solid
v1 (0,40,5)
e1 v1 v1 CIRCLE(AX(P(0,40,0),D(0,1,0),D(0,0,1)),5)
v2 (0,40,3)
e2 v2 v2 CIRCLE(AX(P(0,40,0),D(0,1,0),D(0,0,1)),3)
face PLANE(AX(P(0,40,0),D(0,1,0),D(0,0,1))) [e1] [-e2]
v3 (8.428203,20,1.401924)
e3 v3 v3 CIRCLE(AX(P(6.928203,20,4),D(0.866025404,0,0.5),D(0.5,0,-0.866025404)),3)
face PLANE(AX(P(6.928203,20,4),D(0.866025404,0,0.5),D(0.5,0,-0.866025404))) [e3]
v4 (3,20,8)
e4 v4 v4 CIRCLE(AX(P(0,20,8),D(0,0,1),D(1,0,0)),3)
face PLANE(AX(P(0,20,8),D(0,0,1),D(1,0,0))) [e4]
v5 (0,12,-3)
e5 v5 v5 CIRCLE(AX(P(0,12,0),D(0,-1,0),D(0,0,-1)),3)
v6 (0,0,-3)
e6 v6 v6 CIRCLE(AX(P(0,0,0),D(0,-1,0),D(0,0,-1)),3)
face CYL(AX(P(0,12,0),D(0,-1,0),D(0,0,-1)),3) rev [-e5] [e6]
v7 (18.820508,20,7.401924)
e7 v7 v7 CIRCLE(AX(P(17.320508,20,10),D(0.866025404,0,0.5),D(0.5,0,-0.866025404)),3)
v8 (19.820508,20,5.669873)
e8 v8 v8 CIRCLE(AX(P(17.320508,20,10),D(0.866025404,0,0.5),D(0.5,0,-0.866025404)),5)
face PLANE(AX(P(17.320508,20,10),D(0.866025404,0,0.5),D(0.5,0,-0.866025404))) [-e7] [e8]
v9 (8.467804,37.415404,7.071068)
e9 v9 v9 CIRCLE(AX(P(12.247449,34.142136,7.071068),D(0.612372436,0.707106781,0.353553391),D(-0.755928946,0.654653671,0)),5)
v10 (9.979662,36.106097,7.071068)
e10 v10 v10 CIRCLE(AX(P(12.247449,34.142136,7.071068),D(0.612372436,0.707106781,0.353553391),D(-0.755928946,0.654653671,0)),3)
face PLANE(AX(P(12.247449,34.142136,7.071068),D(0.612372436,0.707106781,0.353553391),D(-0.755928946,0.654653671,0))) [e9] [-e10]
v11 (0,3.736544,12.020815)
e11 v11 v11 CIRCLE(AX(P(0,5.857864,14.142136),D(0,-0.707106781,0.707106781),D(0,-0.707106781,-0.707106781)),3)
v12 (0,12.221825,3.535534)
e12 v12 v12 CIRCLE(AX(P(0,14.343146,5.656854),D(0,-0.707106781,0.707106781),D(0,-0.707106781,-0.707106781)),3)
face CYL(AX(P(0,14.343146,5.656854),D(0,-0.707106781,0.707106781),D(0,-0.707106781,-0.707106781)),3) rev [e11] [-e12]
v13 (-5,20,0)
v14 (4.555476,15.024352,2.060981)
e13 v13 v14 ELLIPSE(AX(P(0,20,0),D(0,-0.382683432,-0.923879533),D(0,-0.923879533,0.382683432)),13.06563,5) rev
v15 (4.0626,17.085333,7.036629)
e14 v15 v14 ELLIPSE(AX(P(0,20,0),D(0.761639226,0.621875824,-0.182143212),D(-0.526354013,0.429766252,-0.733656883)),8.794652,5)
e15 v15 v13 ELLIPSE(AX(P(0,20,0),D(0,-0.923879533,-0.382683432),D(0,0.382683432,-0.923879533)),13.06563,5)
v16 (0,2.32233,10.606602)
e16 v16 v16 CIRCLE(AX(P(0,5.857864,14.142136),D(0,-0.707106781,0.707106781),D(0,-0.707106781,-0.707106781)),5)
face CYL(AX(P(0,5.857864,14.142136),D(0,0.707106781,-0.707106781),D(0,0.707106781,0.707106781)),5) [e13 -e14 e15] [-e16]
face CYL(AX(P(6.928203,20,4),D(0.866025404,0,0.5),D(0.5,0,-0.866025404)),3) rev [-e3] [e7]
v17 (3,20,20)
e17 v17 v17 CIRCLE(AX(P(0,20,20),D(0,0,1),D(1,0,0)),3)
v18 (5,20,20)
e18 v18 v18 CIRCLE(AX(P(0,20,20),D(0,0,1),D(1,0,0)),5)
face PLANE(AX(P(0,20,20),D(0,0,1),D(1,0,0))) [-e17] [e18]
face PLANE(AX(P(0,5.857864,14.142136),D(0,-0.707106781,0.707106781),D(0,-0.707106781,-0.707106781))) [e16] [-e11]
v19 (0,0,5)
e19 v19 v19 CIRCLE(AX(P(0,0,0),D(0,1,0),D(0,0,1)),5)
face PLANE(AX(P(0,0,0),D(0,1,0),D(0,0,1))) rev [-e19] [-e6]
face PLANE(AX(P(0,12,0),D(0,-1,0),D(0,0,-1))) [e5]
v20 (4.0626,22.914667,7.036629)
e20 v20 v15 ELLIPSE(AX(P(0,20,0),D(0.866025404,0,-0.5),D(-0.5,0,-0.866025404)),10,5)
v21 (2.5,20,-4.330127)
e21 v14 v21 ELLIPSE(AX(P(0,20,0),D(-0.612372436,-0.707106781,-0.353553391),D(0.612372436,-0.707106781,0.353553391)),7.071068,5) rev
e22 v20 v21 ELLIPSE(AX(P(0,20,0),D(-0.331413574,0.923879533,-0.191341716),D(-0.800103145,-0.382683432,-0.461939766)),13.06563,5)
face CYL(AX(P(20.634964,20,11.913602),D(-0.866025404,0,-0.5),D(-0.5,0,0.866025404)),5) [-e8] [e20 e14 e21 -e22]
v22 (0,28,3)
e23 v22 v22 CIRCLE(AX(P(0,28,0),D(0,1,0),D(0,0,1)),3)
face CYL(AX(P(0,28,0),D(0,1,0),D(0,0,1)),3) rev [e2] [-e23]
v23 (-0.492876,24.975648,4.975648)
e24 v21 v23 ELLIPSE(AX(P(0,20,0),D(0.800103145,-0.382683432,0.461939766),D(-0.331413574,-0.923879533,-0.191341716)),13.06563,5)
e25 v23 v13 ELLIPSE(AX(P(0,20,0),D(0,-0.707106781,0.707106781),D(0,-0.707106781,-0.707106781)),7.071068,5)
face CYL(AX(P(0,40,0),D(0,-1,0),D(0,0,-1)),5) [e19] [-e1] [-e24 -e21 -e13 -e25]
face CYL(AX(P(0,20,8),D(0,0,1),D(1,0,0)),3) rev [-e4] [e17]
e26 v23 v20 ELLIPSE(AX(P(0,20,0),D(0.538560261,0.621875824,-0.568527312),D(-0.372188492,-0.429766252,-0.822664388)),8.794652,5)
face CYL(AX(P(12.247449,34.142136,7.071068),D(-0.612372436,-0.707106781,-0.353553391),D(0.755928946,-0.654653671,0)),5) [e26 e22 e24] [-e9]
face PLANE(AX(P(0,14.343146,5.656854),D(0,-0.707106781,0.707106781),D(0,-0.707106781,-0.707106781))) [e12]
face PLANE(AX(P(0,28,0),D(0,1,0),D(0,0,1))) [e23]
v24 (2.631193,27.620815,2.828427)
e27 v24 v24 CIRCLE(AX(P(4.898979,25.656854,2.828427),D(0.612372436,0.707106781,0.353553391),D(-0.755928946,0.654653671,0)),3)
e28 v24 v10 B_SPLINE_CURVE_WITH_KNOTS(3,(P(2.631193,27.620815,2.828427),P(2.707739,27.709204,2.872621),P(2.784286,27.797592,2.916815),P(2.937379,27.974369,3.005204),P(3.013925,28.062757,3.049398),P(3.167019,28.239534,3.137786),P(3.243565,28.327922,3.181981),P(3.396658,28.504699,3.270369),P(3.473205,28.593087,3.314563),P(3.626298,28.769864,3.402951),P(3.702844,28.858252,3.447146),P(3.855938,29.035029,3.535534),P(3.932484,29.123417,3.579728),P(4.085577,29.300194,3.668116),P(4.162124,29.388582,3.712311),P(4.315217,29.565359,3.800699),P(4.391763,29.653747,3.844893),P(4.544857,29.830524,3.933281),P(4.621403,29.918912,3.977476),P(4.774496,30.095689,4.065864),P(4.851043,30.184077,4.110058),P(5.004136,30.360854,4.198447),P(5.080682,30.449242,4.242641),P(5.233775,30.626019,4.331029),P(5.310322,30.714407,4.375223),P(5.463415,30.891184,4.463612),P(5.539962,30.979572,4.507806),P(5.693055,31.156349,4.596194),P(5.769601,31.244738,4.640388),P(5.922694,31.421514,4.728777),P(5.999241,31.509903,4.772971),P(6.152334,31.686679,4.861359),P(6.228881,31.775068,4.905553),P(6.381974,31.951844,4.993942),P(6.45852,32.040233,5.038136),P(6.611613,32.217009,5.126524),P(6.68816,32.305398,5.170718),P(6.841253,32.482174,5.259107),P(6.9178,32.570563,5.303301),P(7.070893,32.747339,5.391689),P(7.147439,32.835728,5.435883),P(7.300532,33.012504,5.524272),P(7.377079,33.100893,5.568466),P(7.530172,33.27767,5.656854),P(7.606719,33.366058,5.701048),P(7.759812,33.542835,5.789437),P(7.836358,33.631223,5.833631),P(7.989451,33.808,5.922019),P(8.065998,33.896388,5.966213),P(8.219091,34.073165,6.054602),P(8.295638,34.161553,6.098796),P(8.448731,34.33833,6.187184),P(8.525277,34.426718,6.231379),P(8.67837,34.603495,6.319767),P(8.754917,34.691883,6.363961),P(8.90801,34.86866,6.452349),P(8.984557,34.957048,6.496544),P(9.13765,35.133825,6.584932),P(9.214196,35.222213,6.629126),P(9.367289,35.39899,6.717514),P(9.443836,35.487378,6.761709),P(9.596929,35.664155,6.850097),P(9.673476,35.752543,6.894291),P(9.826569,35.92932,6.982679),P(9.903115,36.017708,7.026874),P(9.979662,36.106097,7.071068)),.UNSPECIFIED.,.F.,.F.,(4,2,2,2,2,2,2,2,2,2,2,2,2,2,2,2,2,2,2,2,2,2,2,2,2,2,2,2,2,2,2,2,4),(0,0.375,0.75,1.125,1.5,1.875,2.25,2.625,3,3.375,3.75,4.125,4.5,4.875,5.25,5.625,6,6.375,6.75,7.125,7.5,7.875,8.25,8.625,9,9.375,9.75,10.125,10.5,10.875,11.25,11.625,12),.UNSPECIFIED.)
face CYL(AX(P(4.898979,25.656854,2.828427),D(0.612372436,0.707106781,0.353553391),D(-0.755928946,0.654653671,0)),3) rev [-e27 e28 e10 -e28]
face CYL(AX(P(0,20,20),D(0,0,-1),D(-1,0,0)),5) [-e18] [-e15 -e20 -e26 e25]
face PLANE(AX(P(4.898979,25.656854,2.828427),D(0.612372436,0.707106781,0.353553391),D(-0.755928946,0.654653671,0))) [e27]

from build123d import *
from OCP.BRepAlgoAPI import BRepAlgoAPI_Cut
from OCP.TopTools import TopTools_ListOfShape

# Parameters (mm, degrees)
SKETCH1_R                = 5
BOSS_EXTRUDE1_DEPTH      = 40
SKETCH2_R                = 5
BOSS_EXTRUDE2_DEPTH      = 20
SKETCH4_R                = 5
BOSS_EXTRUDE3_DEPTH      = 20
BOSS_EXTRUDE4_DEPTH      = 10
BOSS_EXTRUDE4_DEPTH_BACK = 13.827204
SKETCH6_R                = 5
SKETCH8_R                = 5
CUT_EXTRUDE1_DEPTH       = 3.827204
SKETCH13_R               = 5
BOSS_EXTRUDE5_DEPTH      = 20
SKETCH14_R               = 3
CUT_EXTRUDE2_DEPTH       = 12
CUT_EXTRUDE3_START       = -12
SKETCH15_R               = 3
CUT_EXTRUDE3_DEPTH       = 12
SKETCH16_R               = 3
CUT_EXTRUDE4_DEPTH       = 12
SKETCH17_R               = 3
CUT_EXTRUDE5_DEPTH       = 12
SKETCH18_R               = 3
CUT_EXTRUDE6_DEPTH       = 12
SKETCH19_R               = 3
CUT_EXTRUDE7_DEPTH       = 12


with BuildPart() as part:
    # Sketch1 → Boss-Extrude1 (new body)
    with BuildSketch(Plane(origin=(0, 0, 0), x_dir=(1, 0, 0), z_dir=(0, 1, 0))):
        with Locations(Location((0, 0, 0), (0, 0, 270))):
            Circle(SKETCH1_R)
    extrude(amount=BOSS_EXTRUDE1_DEPTH)

    # Sketch2 → Boss-Extrude2 (add)
    with BuildSketch(Plane.XY):
        with Locations((0, 20)):
            Circle(SKETCH2_R)
    extrude(amount=BOSS_EXTRUDE2_DEPTH)

    # Sketch4 → Boss-Extrude3 (add)
    with BuildSketch(Plane(origin=(0, 10, -10), x_dir=(-1, 0, 0), z_dir=(0, -0.7071067811865475, 0.7071067811865477))):
        with Locations(Location((0, -14.142135624, 0), (0, 0, 90))):
            Circle(SKETCH4_R)
    extrude(amount=BOSS_EXTRUDE3_DEPTH)

    # Sketch6 → Boss-Extrude4 (add, two sides: drawn at the far end of the back side and taken through both)
    with BuildSketch(Plane(origin=(11.97471023, 0, 6.913602175), x_dir=(0.49999999999999756, 0, -0.86602540378444), z_dir=(0.86602540378444, 0, 0.49999999999999756)).offset(-BOSS_EXTRUDE4_DEPTH_BACK)):
        with Locations((0, 20)):
            Circle(SKETCH6_R)
    extrude(amount=BOSS_EXTRUDE4_DEPTH + BOSS_EXTRUDE4_DEPTH_BACK)

    # Sketch8 → Cut-Extrude1 (cut)
    with BuildSketch(Plane(origin=(20.634964268, 0, 11.913602175), x_dir=(0.49999999999999756, 0, -0.86602540378444), z_dir=(0.86602540378444, 0, 0.49999999999999756))):
        with Locations((0, 20)):
            Circle(SKETCH8_R)
    extrude(amount=-CUT_EXTRUDE1_DEPTH, mode=Mode.SUBTRACT)

    # Sketch13 → Boss-Extrude5 (add)
    with BuildSketch(Plane(origin=(8.660254038, 10, 5), x_dir=(0.7905694150420939, -0.5477225575051677, -0.2738612787525826), z_dir=(0.6123724356957958, 0.7071067811865471, 0.3535533905932725))):
        with Locations(Location((-10.95445115, 8.94427191, 0), (0, 0, 50.768479516))):
            Circle(SKETCH13_R)
    extrude(amount=BOSS_EXTRUDE5_DEPTH)

    # Sketch14 → Cut-Extrude2 (cut)
    with BuildSketch(Plane(origin=(0, 40, 0), x_dir=(1, 0, 0), z_dir=(0, 1, 0))):
        with Locations(Location((0, 0, 0), (0, 0, 270))):
            Circle(SKETCH14_R)
    extrude(amount=-CUT_EXTRUDE2_DEPTH, mode=Mode.SUBTRACT)

    # Sketch15 → Cut-Extrude3 (cut)
    with BuildSketch(Plane.XZ.offset(CUT_EXTRUDE3_START)):
        with Locations(Location((0, 0, 0), (0, 0, 90))):
            Circle(SKETCH15_R)
    extrude(amount=CUT_EXTRUDE3_DEPTH, mode=Mode.SUBTRACT)

    # Sketch16 → Cut-Extrude4 (cut)
    with BuildSketch(Plane(origin=(0, -4.142135624, 4.142135624), x_dir=(1, 0, 0), z_dir=(0, -0.7071067811865476, 0.7071067811865476))):
        with Locations(Location((0, 14.142135624, 0), (0, 0, 270))):
            Circle(SKETCH16_R)
    extrude(amount=-CUT_EXTRUDE4_DEPTH, mode=Mode.SUBTRACT)

    # Sketch17 → Cut-Extrude5 (cut)
    with BuildSketch(Plane.XY.offset(20)):
        with Locations((0, 20)):
            Circle(SKETCH17_R)
    extrude(amount=-CUT_EXTRUDE5_DEPTH, mode=Mode.SUBTRACT)


with BuildPart() as cut_extrude6_tool:
    # Sketch18 → Cut-Extrude6 (new body)
    with BuildSketch(Plane(origin=(17.320508076, 0, 10), x_dir=(0.49999999999999756, 0, -0.86602540378444), z_dir=(0.86602540378444, 0, 0.49999999999999756))):
        with Locations((0, 20)):
            Circle(SKETCH18_R)
    extrude(amount=-CUT_EXTRUDE6_DEPTH)


with BuildPart() as part_1:
    add(part.part)

    # Cut-Extrude6: cut by cut_extrude6_tool, with a tolerance
    cut_extrude6_stock = TopTools_ListOfShape()
    cut_extrude6_stock.Append(part_1.part.wrapped)
    cut_extrude6_tools = TopTools_ListOfShape()
    cut_extrude6_tools.Append(cut_extrude6_tool.part.wrapped)
    cut_extrude6_cut = BRepAlgoAPI_Cut()
    cut_extrude6_cut.SetArguments(cut_extrude6_stock)
    cut_extrude6_cut.SetTools(cut_extrude6_tools)
    cut_extrude6_cut.SetFuzzyValue(0.00001)
    cut_extrude6_cut.Build()
    add(Compound.cast(cut_extrude6_cut.Shape()).solids(), mode=Mode.REPLACE)

    # Sketch19 → Cut-Extrude7 (cut)
    with BuildSketch(Plane(origin=(20.907702752, 24.142135624, 12.071067812), x_dir=(0.7905694150420939, -0.5477225575051676, -0.273861278752583), z_dir=(0.6123724356957958, 0.7071067811865471, 0.35355339059327245))):
        with Locations(Location((-10.95445115, 8.94427191, 0), (0, 0, 162.976133815))):
            Circle(SKETCH19_R)
    extrude(amount=-CUT_EXTRUDE7_DEPTH, mode=Mode.SUBTRACT)


solid = part_1.part
